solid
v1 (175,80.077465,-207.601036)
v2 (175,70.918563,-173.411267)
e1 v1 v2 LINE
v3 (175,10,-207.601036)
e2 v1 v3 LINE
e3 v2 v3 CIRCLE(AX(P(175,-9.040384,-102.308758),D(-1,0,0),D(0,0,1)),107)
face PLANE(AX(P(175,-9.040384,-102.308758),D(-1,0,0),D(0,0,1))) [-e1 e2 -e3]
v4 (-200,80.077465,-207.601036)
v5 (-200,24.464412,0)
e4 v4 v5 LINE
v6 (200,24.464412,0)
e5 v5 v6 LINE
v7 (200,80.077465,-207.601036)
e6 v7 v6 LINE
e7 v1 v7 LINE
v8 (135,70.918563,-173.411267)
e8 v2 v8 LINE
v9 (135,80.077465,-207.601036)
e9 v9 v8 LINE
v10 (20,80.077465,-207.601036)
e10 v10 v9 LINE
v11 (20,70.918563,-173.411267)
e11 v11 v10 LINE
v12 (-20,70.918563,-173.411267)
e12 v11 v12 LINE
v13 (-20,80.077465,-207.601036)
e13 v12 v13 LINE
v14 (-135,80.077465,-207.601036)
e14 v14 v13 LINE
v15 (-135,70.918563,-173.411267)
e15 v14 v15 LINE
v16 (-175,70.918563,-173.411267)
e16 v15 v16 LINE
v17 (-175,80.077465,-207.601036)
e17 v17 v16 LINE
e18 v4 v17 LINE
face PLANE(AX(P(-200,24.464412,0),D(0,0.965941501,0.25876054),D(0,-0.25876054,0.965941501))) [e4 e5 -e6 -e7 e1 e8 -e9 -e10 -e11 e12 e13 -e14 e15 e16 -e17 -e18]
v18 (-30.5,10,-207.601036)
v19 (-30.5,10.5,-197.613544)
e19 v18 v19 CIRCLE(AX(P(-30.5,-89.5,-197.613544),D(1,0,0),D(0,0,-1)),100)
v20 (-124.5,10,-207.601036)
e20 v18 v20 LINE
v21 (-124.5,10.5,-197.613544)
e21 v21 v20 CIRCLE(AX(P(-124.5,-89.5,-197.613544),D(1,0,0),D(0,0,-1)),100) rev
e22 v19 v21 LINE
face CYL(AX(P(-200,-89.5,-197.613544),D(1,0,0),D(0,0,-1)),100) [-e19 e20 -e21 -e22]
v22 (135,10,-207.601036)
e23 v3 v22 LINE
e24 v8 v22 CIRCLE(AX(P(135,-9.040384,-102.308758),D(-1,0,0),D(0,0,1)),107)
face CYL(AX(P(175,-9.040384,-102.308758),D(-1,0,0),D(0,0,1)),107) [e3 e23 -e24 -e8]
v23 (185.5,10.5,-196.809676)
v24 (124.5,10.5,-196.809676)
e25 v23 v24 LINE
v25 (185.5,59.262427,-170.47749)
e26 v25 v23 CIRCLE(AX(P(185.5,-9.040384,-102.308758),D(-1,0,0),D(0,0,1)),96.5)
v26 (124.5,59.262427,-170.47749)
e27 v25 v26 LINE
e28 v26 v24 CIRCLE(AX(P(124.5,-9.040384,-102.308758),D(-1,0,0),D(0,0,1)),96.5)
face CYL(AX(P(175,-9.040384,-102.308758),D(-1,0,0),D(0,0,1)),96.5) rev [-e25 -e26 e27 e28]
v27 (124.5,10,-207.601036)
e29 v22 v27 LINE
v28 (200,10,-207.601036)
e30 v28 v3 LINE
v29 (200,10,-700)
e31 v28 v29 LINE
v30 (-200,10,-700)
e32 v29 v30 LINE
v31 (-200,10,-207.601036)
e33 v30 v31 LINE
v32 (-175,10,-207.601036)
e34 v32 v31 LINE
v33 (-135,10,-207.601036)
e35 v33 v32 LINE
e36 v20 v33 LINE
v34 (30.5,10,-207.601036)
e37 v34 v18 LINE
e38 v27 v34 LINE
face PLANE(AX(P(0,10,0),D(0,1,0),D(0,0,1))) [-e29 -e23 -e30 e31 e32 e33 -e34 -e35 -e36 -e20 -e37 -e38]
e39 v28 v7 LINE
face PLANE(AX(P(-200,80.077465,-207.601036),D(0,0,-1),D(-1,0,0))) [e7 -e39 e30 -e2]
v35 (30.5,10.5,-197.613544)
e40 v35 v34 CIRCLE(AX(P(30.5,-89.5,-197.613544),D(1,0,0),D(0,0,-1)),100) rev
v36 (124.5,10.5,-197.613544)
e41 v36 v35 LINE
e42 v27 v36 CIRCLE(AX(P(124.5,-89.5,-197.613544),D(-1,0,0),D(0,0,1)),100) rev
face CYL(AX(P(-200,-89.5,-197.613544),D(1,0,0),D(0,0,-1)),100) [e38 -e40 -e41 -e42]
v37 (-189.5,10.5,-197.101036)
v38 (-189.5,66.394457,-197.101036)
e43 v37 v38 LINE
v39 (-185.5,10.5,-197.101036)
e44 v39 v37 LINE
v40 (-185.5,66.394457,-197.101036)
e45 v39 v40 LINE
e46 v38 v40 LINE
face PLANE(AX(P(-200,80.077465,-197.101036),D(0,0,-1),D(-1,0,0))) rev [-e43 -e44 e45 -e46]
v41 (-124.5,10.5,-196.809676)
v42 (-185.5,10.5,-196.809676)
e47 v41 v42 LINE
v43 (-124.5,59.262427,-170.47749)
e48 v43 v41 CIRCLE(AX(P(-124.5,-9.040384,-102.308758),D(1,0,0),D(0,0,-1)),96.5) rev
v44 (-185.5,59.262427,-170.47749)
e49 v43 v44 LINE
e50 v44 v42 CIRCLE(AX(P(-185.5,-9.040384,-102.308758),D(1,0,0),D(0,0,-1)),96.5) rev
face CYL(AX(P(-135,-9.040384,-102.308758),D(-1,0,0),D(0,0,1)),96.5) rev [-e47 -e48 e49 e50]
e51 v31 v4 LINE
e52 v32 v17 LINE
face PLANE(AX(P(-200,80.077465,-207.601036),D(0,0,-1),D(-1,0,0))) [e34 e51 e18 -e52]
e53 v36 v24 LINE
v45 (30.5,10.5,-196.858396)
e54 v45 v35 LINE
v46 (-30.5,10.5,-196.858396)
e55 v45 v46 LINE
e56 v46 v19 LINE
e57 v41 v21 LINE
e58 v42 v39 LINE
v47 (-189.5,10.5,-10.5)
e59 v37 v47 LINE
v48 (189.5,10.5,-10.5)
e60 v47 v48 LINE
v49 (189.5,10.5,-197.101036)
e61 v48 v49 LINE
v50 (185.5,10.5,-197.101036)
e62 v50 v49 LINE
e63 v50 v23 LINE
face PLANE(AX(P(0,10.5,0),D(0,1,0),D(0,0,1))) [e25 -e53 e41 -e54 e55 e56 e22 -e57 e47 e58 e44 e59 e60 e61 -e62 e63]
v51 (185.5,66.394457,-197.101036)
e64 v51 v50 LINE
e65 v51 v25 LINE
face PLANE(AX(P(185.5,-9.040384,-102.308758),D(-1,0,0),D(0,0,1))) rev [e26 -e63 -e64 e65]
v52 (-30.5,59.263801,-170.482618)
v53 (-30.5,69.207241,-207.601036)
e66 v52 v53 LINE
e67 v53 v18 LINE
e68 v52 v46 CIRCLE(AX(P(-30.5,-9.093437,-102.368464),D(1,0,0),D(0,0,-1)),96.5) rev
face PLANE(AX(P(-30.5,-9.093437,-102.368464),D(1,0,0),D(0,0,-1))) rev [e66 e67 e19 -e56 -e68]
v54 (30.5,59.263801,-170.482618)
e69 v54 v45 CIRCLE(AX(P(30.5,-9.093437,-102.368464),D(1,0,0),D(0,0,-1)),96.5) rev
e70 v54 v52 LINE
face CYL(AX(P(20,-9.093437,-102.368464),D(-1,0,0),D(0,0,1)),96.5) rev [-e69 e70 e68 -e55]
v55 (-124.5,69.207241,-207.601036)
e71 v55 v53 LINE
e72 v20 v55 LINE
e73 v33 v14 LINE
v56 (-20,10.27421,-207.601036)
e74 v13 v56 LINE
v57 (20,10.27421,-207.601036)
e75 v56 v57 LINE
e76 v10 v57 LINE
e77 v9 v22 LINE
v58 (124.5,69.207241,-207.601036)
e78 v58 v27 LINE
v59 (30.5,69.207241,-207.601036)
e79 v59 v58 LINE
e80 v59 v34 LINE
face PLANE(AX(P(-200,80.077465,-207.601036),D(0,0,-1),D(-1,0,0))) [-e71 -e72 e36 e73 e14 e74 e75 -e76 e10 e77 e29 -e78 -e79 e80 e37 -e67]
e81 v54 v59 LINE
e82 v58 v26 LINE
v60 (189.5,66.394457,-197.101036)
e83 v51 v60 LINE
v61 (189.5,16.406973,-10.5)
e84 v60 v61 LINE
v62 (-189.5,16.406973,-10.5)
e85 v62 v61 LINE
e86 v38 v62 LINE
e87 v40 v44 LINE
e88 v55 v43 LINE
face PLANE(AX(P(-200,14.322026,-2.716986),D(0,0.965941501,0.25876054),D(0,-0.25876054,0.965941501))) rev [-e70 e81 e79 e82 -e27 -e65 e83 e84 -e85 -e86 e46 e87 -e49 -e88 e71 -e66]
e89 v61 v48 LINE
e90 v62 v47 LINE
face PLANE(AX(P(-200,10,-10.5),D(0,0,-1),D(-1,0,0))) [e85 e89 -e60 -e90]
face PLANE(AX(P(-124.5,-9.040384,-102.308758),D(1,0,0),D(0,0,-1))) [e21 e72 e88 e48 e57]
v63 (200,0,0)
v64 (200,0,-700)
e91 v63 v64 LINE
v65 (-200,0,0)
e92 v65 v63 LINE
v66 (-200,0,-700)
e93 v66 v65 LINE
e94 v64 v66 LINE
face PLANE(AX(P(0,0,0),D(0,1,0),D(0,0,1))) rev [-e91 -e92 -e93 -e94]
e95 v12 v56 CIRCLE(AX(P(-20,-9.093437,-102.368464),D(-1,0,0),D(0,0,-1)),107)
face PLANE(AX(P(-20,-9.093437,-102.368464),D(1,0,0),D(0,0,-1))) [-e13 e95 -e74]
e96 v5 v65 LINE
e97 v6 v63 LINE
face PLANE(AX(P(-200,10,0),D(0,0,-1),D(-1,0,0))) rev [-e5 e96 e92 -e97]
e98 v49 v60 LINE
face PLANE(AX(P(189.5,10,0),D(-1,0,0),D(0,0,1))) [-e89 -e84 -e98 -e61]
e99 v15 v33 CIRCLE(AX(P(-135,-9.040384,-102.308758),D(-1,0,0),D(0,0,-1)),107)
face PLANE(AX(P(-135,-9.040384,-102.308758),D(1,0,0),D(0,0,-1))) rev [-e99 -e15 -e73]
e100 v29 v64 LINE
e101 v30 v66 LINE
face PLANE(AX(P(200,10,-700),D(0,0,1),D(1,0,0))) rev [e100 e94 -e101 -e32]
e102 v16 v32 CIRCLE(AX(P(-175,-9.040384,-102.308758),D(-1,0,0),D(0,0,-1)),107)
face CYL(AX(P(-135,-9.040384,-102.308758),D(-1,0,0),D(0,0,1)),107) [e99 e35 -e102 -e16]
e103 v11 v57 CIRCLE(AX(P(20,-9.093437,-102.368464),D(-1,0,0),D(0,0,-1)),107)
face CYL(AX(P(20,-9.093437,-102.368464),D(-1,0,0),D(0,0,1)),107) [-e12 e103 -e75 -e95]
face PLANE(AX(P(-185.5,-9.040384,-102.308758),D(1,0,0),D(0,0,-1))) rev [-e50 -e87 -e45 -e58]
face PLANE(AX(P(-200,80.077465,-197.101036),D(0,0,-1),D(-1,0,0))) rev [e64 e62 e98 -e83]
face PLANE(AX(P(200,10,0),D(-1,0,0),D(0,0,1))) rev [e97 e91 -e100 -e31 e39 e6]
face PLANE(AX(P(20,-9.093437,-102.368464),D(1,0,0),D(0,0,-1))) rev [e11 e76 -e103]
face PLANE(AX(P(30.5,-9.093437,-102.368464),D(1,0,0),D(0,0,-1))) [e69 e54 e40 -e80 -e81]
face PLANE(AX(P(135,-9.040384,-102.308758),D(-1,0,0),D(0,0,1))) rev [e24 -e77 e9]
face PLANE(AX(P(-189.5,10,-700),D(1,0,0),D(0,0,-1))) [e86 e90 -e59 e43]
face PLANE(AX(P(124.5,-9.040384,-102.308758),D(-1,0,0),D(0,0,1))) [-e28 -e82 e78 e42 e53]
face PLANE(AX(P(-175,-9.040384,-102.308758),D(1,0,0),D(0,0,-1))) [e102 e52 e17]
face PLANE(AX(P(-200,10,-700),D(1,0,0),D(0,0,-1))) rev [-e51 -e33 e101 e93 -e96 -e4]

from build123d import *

# Parameters (mm, degrees)
SKETCH1_W                = 400
SKETCH1_H                = 700
BOSS_EXTRUDE1_DEPTH      = 10
BOSS_EXTRUDE2_DEPTH      = 200
BOSS_EXTRUDE2_DEPTH_BACK = 200
CUT_EXTRUDE3_DEPTH       = 20
CUT_EXTRUDE3_DEPTH_BACK  = 20
CUT_EXTRUDE4_DEPTH       = 20
CUT_EXTRUDE4_DEPTH_BACK  = 20
CUT_EXTRUDE5_DEPTH       = 20
CUT_EXTRUDE5_DEPTH_BACK  = 20
SHELL3_START             = -189.5
SHELL3_DEPTH             = 379
SHELL3_START_2           = -124.5
SHELL3_2_DEPTH           = 94
SHELL3_START_3           = 30.5
SHELL3_3_DEPTH           = 94
SHELL3_4_DEPTH           = 4
SHELL3_START_4           = 185.5
SHELL3_5_DEPTH           = 4
SHELL3_START_5           = -30.5
SHELL3_6_DEPTH           = 61
FILLET1_R                = 100


# Read off the part's stored shape, not the designer's step: Shell3
with BuildPart() as part:
    # Sketch1 → Boss-Extrude1 (new body)
    with BuildSketch(Plane(origin=(0, 0, 0), x_dir=(1, 0, 0), z_dir=(0, 1, 0))):
        with Locations((0, 350)):
            Rectangle(SKETCH1_W, SKETCH1_H)
    extrude(amount=BOSS_EXTRUDE1_DEPTH)

    # Sketch2 → Boss-Extrude2 (add, two sides: drawn at the far end of the back side and taken through both)
    with BuildSketch(Plane(origin=(0, 0, 0), x_dir=(0, 0, -1), z_dir=(1, 0, 0)).offset(-BOSS_EXTRUDE2_DEPTH_BACK)):
        Polygon((0, 0), (0, 24.464411704), (101.405231438, 51.629278733), (207.601036066, 80.077464993), (207.601036066, 0), align=None)
    extrude(amount=BOSS_EXTRUDE2_DEPTH + BOSS_EXTRUDE2_DEPTH_BACK)

    # Sketch5 → Cut-Extrude3 (cut, two sides: drawn at the far end of the back side and taken through both)
    with BuildSketch(Plane(origin=(0, 0, 0), x_dir=(0, 0, -1), z_dir=(1, 0, 0)).offset(-CUT_EXTRUDE3_DEPTH_BACK)):
        with BuildLine():
            Line((207.651134237, 88.230641516), (207.651134237, 10))
            ThreePointArc((207.651134237, 10), (195.644591457, 43.3333125), (173.411266827, 70.918563406))
            Line((173.411266827, 70.918563406), (207.651134237, 88.230641516))
        make_face()
    extrude(amount=CUT_EXTRUDE3_DEPTH + CUT_EXTRUDE3_DEPTH_BACK, mode=Mode.SUBTRACT)

    # Sketch7 → Cut-Extrude4 (cut, two sides: drawn at the far end of the back side and taken through both)
    with BuildSketch(Plane(origin=(155, 0, 0), x_dir=(0, 0, -1), z_dir=(1, 0, 0)).offset(-CUT_EXTRUDE4_DEPTH_BACK)):
        with BuildLine():
            Line((207.601036066, 80.077464993), (207.601036066, 10))
            ThreePointArc((207.601036066, 10), (195.617643187, 43.328041458), (173.411266827, 70.918563406))
            Line((173.411266827, 70.918563406), (164.696313807, 94.748714882))
            Line((164.696313807, 94.748714882), (211.114914406, 101.759857681))
            Line((211.114914406, 101.759857681), (207.601036066, 80.077464993))
        make_face()
    extrude(amount=CUT_EXTRUDE4_DEPTH + CUT_EXTRUDE4_DEPTH_BACK, mode=Mode.SUBTRACT)

    # Sketch8 → Cut-Extrude5 (cut, two sides: drawn at the far end of the back side and taken through both)
    with BuildSketch(Plane(origin=(-155, 0, 0), x_dir=(0, 0, -1), z_dir=(1, 0, 0)).offset(-CUT_EXTRUDE5_DEPTH_BACK)):
        with BuildLine():
            Line((207.601036066, 10), (207.601036066, 80.077464993))
            Line((207.601036066, 80.077464993), (173.411266827, 70.918563406))
            ThreePointArc((173.411266827, 70.918563406), (195.617643187, 43.328041458), (207.601036066, 10))
        make_face()
    extrude(amount=CUT_EXTRUDE5_DEPTH + CUT_EXTRUDE5_DEPTH_BACK, mode=Mode.SUBTRACT)

    # Shell3 outline → Shell3 (cut)
    with BuildSketch(Plane.YZ.offset(SHELL3_START)):
        with BuildLine():
            Line((10.5, -10.5), (10.5, -196.809675626))
            ThreePointArc((10.5, -196.809675626), (36.812126695, -187.219283255), (59.262427205, -170.477489921))
            Line((59.262427205, -170.477489921), (16.406973107, -10.5))
            Line((16.406973107, -10.5), (10.5, -10.5))
        make_face()
    extrude(amount=SHELL3_DEPTH, mode=Mode.SUBTRACT)

    # Shell3 2 outline → Shell3 2 (cut)
    with BuildSketch(Plane.YZ.offset(SHELL3_START_2)):
        with BuildLine():
            Line((10.5, -207.601036066), (69.207241495, -207.601036066))
            Line((69.207241495, -207.601036066), (59.262427205, -170.477489921))
            ThreePointArc((59.262427205, -170.477489921), (36.812126695, -187.219283255), (10.5, -196.809675626))
            Line((10.5, -196.809675626), (10.5, -207.601036066))
        make_face()
    extrude(amount=SHELL3_2_DEPTH, mode=Mode.SUBTRACT)

    # Shell3 3 outline → Shell3 3 (cut)
    with BuildSketch(Plane.YZ.offset(SHELL3_START_3)):
        with BuildLine():
            Line((10.5, -207.601036066), (69.207241495, -207.601036066))
            Line((69.207241495, -207.601036066), (59.262427205, -170.477489921))
            ThreePointArc((59.262427205, -170.477489921), (36.812126695, -187.219283255), (10.5, -196.809675626))
            Line((10.5, -196.809675626), (10.5, -207.601036066))
        make_face()
    extrude(amount=SHELL3_3_DEPTH, mode=Mode.SUBTRACT)

    # Shell3 4 outline → Shell3 4 (cut)
    with BuildSketch(Plane.YZ.offset(SHELL3_START)):
        with BuildLine():
            Line((10.5, -197.101036066), (66.394456595, -197.101036066))
            Line((66.394456595, -197.101036066), (59.262427205, -170.477489921))
            ThreePointArc((59.262427205, -170.477489921), (36.812126695, -187.219283255), (10.5, -196.809675626))
            Line((10.5, -196.809675626), (10.5, -197.101036066))
        make_face()
    extrude(amount=SHELL3_4_DEPTH, mode=Mode.SUBTRACT)

    # Shell3 5 outline → Shell3 5 (cut)
    with BuildSketch(Plane.YZ.offset(SHELL3_START_4)):
        with BuildLine():
            Line((10.5, -197.101036066), (66.394456595, -197.101036066))
            Line((66.394456595, -197.101036066), (59.262427205, -170.477489921))
            ThreePointArc((59.262427205, -170.477489921), (36.812126695, -187.219283255), (10.5, -196.809675626))
            Line((10.5, -196.809675626), (10.5, -197.101036066))
        make_face()
    extrude(amount=SHELL3_5_DEPTH, mode=Mode.SUBTRACT)

    # Shell3 6 outline → Shell3 6 (cut)
    with BuildSketch(Plane.YZ.offset(SHELL3_START_5)):
        with BuildLine():
            Line((10.5, -196.809675626), (10.5, -196.858395835))
            ThreePointArc((10.5, -196.858395835), (36.816809355, -187.247785942), (59.263801063, -170.482618469))
            Line((59.263801063, -170.482618469), (59.262427205, -170.477489921))
            ThreePointArc((59.262427205, -170.477489921), (36.812126695, -187.219283255), (10.5, -196.809675626))
        make_face()
    extrude(amount=SHELL3_6_DEPTH, mode=Mode.SUBTRACT)

    # Fillet1
    # the kernel refuses this fillet: 100 mm, written as the material it takes off along each edge
    with BuildSketch(Plane(origin=(30.5, 10.5, -207.601036066), x_dir=(0, -1.0, -9.585505722497512e-10), z_dir=(1, 0, 0)), Plane(origin=(-124.5, 10.5, -207.601036066), x_dir=(0, -1.0, -9.585505722497512e-10), z_dir=(1, 0, 0))) as fillet1_piece_1:
        with BuildLine():
            CenterArc((99.99999999, -9.987492273), FILLET1_R, 174.26803198, 5.731967965)
            Line((-1e-08, -9.987492177), (0, 0))
            Line((0, 0), (0.5, 0))
        make_face()
    extrude(amount=94, mode=Mode.SUBTRACT)


solid = part.part
